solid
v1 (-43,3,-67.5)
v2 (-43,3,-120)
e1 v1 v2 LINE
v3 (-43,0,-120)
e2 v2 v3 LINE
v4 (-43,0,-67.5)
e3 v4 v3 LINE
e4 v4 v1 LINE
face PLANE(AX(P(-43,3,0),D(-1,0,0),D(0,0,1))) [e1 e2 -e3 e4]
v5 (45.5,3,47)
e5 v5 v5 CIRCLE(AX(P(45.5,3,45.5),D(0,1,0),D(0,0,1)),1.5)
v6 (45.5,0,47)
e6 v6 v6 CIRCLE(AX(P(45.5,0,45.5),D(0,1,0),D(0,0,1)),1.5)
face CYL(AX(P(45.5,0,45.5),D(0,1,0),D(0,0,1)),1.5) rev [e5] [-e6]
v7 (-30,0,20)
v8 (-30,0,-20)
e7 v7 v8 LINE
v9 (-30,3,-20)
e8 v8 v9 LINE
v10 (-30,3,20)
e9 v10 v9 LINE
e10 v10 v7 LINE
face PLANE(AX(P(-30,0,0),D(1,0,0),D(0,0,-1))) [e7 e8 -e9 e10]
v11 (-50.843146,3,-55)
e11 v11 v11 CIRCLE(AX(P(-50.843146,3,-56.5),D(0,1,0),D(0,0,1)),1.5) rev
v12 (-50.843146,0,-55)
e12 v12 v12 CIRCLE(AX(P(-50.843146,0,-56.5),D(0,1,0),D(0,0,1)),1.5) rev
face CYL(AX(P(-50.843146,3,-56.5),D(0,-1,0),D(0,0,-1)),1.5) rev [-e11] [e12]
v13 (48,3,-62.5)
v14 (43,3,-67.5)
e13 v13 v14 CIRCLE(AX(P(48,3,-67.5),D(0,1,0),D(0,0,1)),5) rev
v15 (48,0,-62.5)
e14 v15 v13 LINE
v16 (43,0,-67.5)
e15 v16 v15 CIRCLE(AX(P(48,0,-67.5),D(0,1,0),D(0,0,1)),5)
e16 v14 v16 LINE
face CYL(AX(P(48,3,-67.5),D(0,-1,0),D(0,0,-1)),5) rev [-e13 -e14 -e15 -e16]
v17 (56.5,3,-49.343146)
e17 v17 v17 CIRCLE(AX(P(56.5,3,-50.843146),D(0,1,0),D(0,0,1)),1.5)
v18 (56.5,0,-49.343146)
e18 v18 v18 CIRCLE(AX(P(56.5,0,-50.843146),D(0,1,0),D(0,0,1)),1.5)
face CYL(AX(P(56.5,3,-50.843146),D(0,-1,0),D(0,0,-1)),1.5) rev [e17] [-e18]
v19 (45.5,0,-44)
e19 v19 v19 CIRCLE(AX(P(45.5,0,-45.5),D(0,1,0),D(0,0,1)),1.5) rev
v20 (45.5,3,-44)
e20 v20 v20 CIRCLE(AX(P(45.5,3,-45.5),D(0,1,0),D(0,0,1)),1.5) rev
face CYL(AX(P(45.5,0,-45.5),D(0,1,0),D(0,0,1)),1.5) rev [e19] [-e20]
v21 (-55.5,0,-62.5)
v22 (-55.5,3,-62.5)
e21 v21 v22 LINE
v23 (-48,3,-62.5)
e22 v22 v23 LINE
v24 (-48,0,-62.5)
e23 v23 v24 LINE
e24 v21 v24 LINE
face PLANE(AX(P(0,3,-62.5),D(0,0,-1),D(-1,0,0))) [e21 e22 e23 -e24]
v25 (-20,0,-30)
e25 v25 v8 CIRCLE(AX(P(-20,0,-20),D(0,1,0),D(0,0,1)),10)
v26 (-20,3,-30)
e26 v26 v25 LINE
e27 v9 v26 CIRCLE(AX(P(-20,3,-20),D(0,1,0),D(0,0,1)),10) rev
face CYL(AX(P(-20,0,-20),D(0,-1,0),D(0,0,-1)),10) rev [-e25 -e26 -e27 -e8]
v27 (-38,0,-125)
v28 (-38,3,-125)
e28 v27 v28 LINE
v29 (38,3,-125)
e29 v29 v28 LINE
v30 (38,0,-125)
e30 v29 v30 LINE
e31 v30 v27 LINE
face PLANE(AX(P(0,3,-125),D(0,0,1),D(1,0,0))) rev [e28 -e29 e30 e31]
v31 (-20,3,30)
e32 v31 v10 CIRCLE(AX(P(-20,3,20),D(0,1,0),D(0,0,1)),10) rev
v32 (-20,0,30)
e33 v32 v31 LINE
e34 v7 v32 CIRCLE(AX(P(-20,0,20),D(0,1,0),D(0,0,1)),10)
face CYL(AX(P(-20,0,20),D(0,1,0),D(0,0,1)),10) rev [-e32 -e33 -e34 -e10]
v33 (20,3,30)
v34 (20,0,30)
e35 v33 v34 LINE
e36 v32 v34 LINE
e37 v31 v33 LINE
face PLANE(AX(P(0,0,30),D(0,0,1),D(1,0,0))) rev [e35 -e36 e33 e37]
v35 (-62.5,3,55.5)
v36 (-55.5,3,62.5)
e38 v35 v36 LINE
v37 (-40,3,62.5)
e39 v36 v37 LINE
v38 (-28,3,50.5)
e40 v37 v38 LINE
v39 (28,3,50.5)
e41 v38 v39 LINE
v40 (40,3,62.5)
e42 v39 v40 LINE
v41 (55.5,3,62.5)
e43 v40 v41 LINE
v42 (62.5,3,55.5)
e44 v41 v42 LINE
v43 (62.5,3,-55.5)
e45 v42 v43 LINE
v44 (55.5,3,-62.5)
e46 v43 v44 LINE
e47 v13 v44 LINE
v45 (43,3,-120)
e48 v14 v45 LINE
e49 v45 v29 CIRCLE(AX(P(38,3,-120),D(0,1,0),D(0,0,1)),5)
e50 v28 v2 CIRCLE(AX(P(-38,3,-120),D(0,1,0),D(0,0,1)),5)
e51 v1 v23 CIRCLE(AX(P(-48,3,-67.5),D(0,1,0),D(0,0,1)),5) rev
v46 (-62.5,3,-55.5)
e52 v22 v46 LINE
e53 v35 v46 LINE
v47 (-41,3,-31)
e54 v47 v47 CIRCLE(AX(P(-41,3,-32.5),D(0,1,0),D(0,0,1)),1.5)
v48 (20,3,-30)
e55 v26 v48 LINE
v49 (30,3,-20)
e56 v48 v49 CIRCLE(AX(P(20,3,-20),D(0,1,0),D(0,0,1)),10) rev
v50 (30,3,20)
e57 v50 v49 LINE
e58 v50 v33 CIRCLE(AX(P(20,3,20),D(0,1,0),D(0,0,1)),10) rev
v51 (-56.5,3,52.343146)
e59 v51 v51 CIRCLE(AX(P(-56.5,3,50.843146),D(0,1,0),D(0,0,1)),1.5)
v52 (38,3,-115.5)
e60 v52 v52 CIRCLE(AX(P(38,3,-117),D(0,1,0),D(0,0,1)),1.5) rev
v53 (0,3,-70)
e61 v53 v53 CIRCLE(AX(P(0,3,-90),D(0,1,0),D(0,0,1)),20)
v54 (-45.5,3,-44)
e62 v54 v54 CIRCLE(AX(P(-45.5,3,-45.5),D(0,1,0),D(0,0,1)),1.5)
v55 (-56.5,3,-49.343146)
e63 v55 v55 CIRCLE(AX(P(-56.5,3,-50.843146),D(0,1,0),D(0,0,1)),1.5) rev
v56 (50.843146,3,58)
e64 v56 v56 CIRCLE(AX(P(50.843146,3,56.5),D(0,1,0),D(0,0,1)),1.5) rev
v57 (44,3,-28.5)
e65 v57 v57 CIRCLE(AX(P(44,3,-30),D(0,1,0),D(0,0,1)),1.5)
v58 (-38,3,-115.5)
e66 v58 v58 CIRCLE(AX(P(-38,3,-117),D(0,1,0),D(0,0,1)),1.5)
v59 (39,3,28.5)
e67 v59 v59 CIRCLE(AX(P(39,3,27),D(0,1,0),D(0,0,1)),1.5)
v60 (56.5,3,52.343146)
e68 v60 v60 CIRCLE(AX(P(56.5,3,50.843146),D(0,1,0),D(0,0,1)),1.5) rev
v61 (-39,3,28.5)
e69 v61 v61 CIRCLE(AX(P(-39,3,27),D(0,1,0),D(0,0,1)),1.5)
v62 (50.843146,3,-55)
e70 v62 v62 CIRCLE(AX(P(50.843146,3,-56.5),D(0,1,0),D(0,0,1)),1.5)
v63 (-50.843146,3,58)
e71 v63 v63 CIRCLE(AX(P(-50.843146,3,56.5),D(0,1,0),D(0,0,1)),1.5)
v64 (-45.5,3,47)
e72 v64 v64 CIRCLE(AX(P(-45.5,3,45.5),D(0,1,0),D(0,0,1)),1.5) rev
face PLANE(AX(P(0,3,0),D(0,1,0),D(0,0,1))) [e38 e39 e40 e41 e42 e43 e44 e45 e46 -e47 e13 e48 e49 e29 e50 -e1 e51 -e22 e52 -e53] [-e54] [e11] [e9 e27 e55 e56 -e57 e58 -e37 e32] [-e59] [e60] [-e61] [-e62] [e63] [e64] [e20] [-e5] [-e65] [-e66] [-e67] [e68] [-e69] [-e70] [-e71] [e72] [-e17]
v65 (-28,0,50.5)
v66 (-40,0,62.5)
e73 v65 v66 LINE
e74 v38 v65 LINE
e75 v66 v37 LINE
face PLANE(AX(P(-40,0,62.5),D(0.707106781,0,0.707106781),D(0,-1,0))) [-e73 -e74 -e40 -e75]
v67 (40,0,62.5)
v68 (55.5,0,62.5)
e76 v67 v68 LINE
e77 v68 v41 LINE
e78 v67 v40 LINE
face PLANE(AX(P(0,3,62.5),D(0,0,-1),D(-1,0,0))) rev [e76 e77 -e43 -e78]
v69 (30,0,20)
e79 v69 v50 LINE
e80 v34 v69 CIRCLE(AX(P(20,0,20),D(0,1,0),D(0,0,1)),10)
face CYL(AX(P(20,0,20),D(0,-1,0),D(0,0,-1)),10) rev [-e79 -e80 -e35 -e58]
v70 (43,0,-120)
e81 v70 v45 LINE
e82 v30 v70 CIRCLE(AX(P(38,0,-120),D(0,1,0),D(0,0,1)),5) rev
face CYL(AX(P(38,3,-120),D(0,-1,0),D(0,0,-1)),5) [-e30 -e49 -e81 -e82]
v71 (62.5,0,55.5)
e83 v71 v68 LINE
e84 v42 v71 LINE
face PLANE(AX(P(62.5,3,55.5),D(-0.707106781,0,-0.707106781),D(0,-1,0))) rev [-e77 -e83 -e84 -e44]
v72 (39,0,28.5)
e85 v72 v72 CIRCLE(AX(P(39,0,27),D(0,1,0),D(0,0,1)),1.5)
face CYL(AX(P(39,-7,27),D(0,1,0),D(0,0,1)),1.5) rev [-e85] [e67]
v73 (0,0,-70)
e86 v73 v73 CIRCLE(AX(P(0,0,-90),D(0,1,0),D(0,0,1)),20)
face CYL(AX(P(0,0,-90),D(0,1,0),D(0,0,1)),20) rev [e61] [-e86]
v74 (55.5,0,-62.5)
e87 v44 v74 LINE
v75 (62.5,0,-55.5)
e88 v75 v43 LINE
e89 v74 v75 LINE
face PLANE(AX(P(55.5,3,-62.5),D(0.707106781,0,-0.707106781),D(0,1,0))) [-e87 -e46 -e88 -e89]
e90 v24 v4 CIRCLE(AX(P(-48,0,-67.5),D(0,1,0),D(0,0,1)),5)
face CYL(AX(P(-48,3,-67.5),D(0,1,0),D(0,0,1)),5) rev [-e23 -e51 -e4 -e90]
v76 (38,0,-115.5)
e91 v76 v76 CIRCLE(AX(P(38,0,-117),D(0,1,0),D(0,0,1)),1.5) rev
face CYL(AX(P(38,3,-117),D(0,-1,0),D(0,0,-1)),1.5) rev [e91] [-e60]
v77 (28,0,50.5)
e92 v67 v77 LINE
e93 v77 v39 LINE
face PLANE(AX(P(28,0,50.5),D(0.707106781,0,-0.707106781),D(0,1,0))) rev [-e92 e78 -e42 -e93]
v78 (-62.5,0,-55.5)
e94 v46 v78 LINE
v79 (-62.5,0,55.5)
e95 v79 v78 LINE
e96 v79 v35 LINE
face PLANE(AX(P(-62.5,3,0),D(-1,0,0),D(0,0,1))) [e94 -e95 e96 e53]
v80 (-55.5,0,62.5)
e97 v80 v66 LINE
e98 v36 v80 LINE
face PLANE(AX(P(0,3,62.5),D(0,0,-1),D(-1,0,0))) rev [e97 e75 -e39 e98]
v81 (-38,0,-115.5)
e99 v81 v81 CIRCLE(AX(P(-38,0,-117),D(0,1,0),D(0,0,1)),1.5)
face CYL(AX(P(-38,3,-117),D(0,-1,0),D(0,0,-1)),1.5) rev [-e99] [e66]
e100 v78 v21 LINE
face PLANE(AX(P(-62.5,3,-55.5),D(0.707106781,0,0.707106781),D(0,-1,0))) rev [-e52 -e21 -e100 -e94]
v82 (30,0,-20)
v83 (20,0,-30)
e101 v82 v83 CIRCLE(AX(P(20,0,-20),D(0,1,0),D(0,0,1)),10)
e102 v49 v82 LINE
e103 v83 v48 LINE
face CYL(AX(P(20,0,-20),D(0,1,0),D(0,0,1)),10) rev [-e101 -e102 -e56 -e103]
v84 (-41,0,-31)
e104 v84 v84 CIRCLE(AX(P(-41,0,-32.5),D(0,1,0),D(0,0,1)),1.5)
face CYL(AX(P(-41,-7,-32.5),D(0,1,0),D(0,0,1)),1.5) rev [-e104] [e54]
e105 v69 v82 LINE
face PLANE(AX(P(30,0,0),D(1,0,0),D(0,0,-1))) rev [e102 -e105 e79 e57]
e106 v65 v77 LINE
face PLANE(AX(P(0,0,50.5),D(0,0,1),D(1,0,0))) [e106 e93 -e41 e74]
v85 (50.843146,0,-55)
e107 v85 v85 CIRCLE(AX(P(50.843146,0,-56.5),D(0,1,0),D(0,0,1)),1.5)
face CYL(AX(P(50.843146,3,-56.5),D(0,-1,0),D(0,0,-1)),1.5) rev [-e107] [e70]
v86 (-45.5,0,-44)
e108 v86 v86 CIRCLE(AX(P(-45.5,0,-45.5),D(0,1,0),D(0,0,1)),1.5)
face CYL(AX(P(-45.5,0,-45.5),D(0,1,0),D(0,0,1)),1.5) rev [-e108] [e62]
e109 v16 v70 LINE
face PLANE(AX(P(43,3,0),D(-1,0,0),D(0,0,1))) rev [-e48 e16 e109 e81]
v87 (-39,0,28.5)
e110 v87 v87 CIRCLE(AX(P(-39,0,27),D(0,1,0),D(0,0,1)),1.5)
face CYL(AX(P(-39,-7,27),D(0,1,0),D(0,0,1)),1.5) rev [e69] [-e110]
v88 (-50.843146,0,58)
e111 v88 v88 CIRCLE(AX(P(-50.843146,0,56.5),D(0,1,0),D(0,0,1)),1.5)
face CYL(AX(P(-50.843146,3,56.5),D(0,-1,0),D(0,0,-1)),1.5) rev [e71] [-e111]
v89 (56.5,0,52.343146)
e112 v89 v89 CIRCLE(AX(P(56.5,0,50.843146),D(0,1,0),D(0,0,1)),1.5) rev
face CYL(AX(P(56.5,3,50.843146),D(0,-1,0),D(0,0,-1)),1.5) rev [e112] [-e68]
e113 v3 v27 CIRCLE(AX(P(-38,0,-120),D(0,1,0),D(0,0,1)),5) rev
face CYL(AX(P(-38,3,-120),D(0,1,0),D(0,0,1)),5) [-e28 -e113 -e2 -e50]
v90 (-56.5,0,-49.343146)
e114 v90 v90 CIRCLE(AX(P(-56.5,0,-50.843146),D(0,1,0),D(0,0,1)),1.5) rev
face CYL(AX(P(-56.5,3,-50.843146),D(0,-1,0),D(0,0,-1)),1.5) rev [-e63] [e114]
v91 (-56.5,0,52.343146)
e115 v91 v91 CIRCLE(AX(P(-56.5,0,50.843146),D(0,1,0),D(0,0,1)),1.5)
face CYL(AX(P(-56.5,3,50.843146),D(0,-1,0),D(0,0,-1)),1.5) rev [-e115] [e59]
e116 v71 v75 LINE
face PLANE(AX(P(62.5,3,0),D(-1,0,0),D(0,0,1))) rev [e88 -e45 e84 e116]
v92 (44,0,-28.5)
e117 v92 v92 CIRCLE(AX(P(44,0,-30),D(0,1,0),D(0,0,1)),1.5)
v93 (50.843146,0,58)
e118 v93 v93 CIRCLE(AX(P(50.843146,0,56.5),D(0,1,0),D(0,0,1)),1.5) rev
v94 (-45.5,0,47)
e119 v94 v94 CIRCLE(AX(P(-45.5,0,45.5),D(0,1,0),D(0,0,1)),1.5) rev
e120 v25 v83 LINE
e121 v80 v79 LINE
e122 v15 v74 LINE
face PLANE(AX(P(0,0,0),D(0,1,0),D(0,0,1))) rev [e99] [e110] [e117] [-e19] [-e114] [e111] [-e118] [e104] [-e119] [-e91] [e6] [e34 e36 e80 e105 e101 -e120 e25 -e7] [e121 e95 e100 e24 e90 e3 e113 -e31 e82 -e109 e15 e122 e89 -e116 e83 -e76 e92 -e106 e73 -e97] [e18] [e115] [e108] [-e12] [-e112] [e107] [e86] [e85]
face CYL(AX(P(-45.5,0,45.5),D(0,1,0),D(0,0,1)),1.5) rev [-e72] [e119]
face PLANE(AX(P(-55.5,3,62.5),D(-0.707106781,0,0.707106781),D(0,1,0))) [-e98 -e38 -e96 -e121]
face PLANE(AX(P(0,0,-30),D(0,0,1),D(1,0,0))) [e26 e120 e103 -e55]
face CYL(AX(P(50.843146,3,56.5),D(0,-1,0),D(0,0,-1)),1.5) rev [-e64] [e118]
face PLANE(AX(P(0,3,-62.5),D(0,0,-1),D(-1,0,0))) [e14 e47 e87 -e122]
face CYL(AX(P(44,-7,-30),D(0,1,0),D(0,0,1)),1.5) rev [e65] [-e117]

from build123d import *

# Parameters (mm, degrees)
SKETCH_1_R          = 1.5
EXTRUDE_1_DEPTH     = 3
CHAMFER_1_SIZE      = 7
FILLET_1_R          = 5
SKETCH_3_W          = 60
SKETCH_3_H          = 60
SKETCH_3_R          = 1.5
SKETCH_3_R_2        = 20
SKETCH_3_W_2        = 80
SKETCH_3_H_2        = 12
CUT_EXTRUDE_1_DEPTH = 3
FILLET_3_R          = 10
CHAMFER_2_SIZE      = 12
SKETCH_4_R          = 1.5
CUT_EXTRUDE_2_DEPTH = 10


with BuildPart() as part:
    # 草图1 → 凸台-拉伸1 (new body)
    with BuildSketch(Plane(origin=(0, 0, 0), x_dir=(1, 0, 0), z_dir=(0, 1, 0))):
        Polygon((-62.5, 62.5), (-62.5, -62.5), (62.5, -62.5), (62.5, 62.5), (43, 62.5), (43, 125), (-43, 125), (-43, 62.5), align=None)
        with Locations(Location((-56.5, -50.843145751, 0), (0, 0, 270))):
            Circle(SKETCH_1_R, mode=Mode.SUBTRACT)
        with Locations(Location((-50.843145751, -56.5, 0), (0, 0, 270))):
            Circle(SKETCH_1_R, mode=Mode.SUBTRACT)
        with Locations(Location((50.843145751, -56.5, 0), (0, 0, 270))):
            Circle(SKETCH_1_R, mode=Mode.SUBTRACT)
        with Locations(Location((56.5, -50.843145751, 0), (0, 0, 270))):
            Circle(SKETCH_1_R, mode=Mode.SUBTRACT)
        with Locations(Location((-56.5, 50.843145751, 0), (0, 0, 270))):
            Circle(SKETCH_1_R, mode=Mode.SUBTRACT)
        with Locations(Location((-50.843145751, 56.5, 0), (0, 0, 270))):
            Circle(SKETCH_1_R, mode=Mode.SUBTRACT)
        with Locations(Location((56.5, 50.843145751, 0), (0, 0, 270))):
            Circle(SKETCH_1_R, mode=Mode.SUBTRACT)
        with Locations(Location((50.843145751, 56.5, 0), (0, 0, 270))):
            Circle(SKETCH_1_R, mode=Mode.SUBTRACT)
        with Locations(Location((38, 117, 0), (0, 0, 270))):
            Circle(SKETCH_1_R, mode=Mode.SUBTRACT)
        with Locations(Location((-38, 117, 0), (0, 0, 270))):
            Circle(SKETCH_1_R, mode=Mode.SUBTRACT)
    extrude(amount=EXTRUDE_1_DEPTH)

    # 倒角1
    chamfer_1_edges = [part.edges().sort_by_distance(p)[0] for p in [
        (-62.5, 1.5, 62.5),
        (-62.5, 1.5, -62.5),
        (62.5, 1.5, -62.5),
        (62.5, 1.5, 62.5),
    ]]
    chamfer(chamfer_1_edges, length=CHAMFER_1_SIZE)

    # 圆角1
    fillet_1_edges = [part.edges().sort_by_distance(p)[0] for p in [
        (-43, 1.5, -62.5),
        (-43, 1.5, -125),
        (43, 1.5, -125),
        (43, 1.5, -62.5),
    ]]
    fillet(fillet_1_edges, radius=FILLET_1_R)

    # 草图3 → 切除-拉伸1 (cut)
    with BuildSketch(Plane(origin=(0, 3, 0), x_dir=(1, 0, 0), z_dir=(0, 1, 0))):
        Rectangle(SKETCH_3_W, SKETCH_3_H)
        with Locations(Location((-45.5, 45.5, 0), (0, 0, 270))):
            Circle(SKETCH_3_R)
        with Locations(Location((45.5, 45.5, 0), (0, 0, 270))):
            Circle(SKETCH_3_R)
        with Locations(Location((45.5, -45.5, 0), (0, 0, 270))):
            Circle(SKETCH_3_R)
        with Locations(Location((-45.5, -45.5, 0), (0, 0, 270))):
            Circle(SKETCH_3_R)
        with Locations(Location((0, 90, 0), (0, 0, 270))):
            Circle(SKETCH_3_R_2)
        with Locations((0, -56.5)):
            Rectangle(SKETCH_3_W_2, SKETCH_3_H_2)
    extrude(amount=-CUT_EXTRUDE_1_DEPTH, mode=Mode.SUBTRACT)

    # 圆角3
    fillet_3_edges = [part.edges().sort_by_distance(p)[0] for p in [
        (30, 1.5, 30),
        (-30, 1.5, 30),
        (-30, 1.5, -30),
        (30, 1.5, -30),
    ]]
    fillet(fillet_3_edges, radius=FILLET_3_R)

    # 倒角2
    chamfer_2_edges = [part.edges().sort_by_distance(p)[0] for p in [
        (40, 1.5, 50.5),
        (-40, 1.5, 50.5),
    ]]
    chamfer(chamfer_2_edges, length=CHAMFER_2_SIZE - 0.0001)  # a hair under: the kernel refuses the full size

    # 草图4 → 切除-拉伸2 (cut)
    with BuildSketch(Plane(origin=(0, 3, 0), x_dir=(1, 0, 0), z_dir=(0, 1, 0))):
        with Locations(Location((-41, 32.5, 0), (0, 0, 270))):
            Circle(SKETCH_4_R)
        with Locations(Location((44, 30, 0), (0, 0, 270))):
            Circle(SKETCH_4_R)
        with Locations(Location((-39, -27, 0), (0, 0, 270))):
            Circle(SKETCH_4_R)
        with Locations(Location((39, -27, 0), (0, 0, 270))):
            Circle(SKETCH_4_R)
    extrude(amount=-CUT_EXTRUDE_2_DEPTH, mode=Mode.SUBTRACT)


solid = part.part
